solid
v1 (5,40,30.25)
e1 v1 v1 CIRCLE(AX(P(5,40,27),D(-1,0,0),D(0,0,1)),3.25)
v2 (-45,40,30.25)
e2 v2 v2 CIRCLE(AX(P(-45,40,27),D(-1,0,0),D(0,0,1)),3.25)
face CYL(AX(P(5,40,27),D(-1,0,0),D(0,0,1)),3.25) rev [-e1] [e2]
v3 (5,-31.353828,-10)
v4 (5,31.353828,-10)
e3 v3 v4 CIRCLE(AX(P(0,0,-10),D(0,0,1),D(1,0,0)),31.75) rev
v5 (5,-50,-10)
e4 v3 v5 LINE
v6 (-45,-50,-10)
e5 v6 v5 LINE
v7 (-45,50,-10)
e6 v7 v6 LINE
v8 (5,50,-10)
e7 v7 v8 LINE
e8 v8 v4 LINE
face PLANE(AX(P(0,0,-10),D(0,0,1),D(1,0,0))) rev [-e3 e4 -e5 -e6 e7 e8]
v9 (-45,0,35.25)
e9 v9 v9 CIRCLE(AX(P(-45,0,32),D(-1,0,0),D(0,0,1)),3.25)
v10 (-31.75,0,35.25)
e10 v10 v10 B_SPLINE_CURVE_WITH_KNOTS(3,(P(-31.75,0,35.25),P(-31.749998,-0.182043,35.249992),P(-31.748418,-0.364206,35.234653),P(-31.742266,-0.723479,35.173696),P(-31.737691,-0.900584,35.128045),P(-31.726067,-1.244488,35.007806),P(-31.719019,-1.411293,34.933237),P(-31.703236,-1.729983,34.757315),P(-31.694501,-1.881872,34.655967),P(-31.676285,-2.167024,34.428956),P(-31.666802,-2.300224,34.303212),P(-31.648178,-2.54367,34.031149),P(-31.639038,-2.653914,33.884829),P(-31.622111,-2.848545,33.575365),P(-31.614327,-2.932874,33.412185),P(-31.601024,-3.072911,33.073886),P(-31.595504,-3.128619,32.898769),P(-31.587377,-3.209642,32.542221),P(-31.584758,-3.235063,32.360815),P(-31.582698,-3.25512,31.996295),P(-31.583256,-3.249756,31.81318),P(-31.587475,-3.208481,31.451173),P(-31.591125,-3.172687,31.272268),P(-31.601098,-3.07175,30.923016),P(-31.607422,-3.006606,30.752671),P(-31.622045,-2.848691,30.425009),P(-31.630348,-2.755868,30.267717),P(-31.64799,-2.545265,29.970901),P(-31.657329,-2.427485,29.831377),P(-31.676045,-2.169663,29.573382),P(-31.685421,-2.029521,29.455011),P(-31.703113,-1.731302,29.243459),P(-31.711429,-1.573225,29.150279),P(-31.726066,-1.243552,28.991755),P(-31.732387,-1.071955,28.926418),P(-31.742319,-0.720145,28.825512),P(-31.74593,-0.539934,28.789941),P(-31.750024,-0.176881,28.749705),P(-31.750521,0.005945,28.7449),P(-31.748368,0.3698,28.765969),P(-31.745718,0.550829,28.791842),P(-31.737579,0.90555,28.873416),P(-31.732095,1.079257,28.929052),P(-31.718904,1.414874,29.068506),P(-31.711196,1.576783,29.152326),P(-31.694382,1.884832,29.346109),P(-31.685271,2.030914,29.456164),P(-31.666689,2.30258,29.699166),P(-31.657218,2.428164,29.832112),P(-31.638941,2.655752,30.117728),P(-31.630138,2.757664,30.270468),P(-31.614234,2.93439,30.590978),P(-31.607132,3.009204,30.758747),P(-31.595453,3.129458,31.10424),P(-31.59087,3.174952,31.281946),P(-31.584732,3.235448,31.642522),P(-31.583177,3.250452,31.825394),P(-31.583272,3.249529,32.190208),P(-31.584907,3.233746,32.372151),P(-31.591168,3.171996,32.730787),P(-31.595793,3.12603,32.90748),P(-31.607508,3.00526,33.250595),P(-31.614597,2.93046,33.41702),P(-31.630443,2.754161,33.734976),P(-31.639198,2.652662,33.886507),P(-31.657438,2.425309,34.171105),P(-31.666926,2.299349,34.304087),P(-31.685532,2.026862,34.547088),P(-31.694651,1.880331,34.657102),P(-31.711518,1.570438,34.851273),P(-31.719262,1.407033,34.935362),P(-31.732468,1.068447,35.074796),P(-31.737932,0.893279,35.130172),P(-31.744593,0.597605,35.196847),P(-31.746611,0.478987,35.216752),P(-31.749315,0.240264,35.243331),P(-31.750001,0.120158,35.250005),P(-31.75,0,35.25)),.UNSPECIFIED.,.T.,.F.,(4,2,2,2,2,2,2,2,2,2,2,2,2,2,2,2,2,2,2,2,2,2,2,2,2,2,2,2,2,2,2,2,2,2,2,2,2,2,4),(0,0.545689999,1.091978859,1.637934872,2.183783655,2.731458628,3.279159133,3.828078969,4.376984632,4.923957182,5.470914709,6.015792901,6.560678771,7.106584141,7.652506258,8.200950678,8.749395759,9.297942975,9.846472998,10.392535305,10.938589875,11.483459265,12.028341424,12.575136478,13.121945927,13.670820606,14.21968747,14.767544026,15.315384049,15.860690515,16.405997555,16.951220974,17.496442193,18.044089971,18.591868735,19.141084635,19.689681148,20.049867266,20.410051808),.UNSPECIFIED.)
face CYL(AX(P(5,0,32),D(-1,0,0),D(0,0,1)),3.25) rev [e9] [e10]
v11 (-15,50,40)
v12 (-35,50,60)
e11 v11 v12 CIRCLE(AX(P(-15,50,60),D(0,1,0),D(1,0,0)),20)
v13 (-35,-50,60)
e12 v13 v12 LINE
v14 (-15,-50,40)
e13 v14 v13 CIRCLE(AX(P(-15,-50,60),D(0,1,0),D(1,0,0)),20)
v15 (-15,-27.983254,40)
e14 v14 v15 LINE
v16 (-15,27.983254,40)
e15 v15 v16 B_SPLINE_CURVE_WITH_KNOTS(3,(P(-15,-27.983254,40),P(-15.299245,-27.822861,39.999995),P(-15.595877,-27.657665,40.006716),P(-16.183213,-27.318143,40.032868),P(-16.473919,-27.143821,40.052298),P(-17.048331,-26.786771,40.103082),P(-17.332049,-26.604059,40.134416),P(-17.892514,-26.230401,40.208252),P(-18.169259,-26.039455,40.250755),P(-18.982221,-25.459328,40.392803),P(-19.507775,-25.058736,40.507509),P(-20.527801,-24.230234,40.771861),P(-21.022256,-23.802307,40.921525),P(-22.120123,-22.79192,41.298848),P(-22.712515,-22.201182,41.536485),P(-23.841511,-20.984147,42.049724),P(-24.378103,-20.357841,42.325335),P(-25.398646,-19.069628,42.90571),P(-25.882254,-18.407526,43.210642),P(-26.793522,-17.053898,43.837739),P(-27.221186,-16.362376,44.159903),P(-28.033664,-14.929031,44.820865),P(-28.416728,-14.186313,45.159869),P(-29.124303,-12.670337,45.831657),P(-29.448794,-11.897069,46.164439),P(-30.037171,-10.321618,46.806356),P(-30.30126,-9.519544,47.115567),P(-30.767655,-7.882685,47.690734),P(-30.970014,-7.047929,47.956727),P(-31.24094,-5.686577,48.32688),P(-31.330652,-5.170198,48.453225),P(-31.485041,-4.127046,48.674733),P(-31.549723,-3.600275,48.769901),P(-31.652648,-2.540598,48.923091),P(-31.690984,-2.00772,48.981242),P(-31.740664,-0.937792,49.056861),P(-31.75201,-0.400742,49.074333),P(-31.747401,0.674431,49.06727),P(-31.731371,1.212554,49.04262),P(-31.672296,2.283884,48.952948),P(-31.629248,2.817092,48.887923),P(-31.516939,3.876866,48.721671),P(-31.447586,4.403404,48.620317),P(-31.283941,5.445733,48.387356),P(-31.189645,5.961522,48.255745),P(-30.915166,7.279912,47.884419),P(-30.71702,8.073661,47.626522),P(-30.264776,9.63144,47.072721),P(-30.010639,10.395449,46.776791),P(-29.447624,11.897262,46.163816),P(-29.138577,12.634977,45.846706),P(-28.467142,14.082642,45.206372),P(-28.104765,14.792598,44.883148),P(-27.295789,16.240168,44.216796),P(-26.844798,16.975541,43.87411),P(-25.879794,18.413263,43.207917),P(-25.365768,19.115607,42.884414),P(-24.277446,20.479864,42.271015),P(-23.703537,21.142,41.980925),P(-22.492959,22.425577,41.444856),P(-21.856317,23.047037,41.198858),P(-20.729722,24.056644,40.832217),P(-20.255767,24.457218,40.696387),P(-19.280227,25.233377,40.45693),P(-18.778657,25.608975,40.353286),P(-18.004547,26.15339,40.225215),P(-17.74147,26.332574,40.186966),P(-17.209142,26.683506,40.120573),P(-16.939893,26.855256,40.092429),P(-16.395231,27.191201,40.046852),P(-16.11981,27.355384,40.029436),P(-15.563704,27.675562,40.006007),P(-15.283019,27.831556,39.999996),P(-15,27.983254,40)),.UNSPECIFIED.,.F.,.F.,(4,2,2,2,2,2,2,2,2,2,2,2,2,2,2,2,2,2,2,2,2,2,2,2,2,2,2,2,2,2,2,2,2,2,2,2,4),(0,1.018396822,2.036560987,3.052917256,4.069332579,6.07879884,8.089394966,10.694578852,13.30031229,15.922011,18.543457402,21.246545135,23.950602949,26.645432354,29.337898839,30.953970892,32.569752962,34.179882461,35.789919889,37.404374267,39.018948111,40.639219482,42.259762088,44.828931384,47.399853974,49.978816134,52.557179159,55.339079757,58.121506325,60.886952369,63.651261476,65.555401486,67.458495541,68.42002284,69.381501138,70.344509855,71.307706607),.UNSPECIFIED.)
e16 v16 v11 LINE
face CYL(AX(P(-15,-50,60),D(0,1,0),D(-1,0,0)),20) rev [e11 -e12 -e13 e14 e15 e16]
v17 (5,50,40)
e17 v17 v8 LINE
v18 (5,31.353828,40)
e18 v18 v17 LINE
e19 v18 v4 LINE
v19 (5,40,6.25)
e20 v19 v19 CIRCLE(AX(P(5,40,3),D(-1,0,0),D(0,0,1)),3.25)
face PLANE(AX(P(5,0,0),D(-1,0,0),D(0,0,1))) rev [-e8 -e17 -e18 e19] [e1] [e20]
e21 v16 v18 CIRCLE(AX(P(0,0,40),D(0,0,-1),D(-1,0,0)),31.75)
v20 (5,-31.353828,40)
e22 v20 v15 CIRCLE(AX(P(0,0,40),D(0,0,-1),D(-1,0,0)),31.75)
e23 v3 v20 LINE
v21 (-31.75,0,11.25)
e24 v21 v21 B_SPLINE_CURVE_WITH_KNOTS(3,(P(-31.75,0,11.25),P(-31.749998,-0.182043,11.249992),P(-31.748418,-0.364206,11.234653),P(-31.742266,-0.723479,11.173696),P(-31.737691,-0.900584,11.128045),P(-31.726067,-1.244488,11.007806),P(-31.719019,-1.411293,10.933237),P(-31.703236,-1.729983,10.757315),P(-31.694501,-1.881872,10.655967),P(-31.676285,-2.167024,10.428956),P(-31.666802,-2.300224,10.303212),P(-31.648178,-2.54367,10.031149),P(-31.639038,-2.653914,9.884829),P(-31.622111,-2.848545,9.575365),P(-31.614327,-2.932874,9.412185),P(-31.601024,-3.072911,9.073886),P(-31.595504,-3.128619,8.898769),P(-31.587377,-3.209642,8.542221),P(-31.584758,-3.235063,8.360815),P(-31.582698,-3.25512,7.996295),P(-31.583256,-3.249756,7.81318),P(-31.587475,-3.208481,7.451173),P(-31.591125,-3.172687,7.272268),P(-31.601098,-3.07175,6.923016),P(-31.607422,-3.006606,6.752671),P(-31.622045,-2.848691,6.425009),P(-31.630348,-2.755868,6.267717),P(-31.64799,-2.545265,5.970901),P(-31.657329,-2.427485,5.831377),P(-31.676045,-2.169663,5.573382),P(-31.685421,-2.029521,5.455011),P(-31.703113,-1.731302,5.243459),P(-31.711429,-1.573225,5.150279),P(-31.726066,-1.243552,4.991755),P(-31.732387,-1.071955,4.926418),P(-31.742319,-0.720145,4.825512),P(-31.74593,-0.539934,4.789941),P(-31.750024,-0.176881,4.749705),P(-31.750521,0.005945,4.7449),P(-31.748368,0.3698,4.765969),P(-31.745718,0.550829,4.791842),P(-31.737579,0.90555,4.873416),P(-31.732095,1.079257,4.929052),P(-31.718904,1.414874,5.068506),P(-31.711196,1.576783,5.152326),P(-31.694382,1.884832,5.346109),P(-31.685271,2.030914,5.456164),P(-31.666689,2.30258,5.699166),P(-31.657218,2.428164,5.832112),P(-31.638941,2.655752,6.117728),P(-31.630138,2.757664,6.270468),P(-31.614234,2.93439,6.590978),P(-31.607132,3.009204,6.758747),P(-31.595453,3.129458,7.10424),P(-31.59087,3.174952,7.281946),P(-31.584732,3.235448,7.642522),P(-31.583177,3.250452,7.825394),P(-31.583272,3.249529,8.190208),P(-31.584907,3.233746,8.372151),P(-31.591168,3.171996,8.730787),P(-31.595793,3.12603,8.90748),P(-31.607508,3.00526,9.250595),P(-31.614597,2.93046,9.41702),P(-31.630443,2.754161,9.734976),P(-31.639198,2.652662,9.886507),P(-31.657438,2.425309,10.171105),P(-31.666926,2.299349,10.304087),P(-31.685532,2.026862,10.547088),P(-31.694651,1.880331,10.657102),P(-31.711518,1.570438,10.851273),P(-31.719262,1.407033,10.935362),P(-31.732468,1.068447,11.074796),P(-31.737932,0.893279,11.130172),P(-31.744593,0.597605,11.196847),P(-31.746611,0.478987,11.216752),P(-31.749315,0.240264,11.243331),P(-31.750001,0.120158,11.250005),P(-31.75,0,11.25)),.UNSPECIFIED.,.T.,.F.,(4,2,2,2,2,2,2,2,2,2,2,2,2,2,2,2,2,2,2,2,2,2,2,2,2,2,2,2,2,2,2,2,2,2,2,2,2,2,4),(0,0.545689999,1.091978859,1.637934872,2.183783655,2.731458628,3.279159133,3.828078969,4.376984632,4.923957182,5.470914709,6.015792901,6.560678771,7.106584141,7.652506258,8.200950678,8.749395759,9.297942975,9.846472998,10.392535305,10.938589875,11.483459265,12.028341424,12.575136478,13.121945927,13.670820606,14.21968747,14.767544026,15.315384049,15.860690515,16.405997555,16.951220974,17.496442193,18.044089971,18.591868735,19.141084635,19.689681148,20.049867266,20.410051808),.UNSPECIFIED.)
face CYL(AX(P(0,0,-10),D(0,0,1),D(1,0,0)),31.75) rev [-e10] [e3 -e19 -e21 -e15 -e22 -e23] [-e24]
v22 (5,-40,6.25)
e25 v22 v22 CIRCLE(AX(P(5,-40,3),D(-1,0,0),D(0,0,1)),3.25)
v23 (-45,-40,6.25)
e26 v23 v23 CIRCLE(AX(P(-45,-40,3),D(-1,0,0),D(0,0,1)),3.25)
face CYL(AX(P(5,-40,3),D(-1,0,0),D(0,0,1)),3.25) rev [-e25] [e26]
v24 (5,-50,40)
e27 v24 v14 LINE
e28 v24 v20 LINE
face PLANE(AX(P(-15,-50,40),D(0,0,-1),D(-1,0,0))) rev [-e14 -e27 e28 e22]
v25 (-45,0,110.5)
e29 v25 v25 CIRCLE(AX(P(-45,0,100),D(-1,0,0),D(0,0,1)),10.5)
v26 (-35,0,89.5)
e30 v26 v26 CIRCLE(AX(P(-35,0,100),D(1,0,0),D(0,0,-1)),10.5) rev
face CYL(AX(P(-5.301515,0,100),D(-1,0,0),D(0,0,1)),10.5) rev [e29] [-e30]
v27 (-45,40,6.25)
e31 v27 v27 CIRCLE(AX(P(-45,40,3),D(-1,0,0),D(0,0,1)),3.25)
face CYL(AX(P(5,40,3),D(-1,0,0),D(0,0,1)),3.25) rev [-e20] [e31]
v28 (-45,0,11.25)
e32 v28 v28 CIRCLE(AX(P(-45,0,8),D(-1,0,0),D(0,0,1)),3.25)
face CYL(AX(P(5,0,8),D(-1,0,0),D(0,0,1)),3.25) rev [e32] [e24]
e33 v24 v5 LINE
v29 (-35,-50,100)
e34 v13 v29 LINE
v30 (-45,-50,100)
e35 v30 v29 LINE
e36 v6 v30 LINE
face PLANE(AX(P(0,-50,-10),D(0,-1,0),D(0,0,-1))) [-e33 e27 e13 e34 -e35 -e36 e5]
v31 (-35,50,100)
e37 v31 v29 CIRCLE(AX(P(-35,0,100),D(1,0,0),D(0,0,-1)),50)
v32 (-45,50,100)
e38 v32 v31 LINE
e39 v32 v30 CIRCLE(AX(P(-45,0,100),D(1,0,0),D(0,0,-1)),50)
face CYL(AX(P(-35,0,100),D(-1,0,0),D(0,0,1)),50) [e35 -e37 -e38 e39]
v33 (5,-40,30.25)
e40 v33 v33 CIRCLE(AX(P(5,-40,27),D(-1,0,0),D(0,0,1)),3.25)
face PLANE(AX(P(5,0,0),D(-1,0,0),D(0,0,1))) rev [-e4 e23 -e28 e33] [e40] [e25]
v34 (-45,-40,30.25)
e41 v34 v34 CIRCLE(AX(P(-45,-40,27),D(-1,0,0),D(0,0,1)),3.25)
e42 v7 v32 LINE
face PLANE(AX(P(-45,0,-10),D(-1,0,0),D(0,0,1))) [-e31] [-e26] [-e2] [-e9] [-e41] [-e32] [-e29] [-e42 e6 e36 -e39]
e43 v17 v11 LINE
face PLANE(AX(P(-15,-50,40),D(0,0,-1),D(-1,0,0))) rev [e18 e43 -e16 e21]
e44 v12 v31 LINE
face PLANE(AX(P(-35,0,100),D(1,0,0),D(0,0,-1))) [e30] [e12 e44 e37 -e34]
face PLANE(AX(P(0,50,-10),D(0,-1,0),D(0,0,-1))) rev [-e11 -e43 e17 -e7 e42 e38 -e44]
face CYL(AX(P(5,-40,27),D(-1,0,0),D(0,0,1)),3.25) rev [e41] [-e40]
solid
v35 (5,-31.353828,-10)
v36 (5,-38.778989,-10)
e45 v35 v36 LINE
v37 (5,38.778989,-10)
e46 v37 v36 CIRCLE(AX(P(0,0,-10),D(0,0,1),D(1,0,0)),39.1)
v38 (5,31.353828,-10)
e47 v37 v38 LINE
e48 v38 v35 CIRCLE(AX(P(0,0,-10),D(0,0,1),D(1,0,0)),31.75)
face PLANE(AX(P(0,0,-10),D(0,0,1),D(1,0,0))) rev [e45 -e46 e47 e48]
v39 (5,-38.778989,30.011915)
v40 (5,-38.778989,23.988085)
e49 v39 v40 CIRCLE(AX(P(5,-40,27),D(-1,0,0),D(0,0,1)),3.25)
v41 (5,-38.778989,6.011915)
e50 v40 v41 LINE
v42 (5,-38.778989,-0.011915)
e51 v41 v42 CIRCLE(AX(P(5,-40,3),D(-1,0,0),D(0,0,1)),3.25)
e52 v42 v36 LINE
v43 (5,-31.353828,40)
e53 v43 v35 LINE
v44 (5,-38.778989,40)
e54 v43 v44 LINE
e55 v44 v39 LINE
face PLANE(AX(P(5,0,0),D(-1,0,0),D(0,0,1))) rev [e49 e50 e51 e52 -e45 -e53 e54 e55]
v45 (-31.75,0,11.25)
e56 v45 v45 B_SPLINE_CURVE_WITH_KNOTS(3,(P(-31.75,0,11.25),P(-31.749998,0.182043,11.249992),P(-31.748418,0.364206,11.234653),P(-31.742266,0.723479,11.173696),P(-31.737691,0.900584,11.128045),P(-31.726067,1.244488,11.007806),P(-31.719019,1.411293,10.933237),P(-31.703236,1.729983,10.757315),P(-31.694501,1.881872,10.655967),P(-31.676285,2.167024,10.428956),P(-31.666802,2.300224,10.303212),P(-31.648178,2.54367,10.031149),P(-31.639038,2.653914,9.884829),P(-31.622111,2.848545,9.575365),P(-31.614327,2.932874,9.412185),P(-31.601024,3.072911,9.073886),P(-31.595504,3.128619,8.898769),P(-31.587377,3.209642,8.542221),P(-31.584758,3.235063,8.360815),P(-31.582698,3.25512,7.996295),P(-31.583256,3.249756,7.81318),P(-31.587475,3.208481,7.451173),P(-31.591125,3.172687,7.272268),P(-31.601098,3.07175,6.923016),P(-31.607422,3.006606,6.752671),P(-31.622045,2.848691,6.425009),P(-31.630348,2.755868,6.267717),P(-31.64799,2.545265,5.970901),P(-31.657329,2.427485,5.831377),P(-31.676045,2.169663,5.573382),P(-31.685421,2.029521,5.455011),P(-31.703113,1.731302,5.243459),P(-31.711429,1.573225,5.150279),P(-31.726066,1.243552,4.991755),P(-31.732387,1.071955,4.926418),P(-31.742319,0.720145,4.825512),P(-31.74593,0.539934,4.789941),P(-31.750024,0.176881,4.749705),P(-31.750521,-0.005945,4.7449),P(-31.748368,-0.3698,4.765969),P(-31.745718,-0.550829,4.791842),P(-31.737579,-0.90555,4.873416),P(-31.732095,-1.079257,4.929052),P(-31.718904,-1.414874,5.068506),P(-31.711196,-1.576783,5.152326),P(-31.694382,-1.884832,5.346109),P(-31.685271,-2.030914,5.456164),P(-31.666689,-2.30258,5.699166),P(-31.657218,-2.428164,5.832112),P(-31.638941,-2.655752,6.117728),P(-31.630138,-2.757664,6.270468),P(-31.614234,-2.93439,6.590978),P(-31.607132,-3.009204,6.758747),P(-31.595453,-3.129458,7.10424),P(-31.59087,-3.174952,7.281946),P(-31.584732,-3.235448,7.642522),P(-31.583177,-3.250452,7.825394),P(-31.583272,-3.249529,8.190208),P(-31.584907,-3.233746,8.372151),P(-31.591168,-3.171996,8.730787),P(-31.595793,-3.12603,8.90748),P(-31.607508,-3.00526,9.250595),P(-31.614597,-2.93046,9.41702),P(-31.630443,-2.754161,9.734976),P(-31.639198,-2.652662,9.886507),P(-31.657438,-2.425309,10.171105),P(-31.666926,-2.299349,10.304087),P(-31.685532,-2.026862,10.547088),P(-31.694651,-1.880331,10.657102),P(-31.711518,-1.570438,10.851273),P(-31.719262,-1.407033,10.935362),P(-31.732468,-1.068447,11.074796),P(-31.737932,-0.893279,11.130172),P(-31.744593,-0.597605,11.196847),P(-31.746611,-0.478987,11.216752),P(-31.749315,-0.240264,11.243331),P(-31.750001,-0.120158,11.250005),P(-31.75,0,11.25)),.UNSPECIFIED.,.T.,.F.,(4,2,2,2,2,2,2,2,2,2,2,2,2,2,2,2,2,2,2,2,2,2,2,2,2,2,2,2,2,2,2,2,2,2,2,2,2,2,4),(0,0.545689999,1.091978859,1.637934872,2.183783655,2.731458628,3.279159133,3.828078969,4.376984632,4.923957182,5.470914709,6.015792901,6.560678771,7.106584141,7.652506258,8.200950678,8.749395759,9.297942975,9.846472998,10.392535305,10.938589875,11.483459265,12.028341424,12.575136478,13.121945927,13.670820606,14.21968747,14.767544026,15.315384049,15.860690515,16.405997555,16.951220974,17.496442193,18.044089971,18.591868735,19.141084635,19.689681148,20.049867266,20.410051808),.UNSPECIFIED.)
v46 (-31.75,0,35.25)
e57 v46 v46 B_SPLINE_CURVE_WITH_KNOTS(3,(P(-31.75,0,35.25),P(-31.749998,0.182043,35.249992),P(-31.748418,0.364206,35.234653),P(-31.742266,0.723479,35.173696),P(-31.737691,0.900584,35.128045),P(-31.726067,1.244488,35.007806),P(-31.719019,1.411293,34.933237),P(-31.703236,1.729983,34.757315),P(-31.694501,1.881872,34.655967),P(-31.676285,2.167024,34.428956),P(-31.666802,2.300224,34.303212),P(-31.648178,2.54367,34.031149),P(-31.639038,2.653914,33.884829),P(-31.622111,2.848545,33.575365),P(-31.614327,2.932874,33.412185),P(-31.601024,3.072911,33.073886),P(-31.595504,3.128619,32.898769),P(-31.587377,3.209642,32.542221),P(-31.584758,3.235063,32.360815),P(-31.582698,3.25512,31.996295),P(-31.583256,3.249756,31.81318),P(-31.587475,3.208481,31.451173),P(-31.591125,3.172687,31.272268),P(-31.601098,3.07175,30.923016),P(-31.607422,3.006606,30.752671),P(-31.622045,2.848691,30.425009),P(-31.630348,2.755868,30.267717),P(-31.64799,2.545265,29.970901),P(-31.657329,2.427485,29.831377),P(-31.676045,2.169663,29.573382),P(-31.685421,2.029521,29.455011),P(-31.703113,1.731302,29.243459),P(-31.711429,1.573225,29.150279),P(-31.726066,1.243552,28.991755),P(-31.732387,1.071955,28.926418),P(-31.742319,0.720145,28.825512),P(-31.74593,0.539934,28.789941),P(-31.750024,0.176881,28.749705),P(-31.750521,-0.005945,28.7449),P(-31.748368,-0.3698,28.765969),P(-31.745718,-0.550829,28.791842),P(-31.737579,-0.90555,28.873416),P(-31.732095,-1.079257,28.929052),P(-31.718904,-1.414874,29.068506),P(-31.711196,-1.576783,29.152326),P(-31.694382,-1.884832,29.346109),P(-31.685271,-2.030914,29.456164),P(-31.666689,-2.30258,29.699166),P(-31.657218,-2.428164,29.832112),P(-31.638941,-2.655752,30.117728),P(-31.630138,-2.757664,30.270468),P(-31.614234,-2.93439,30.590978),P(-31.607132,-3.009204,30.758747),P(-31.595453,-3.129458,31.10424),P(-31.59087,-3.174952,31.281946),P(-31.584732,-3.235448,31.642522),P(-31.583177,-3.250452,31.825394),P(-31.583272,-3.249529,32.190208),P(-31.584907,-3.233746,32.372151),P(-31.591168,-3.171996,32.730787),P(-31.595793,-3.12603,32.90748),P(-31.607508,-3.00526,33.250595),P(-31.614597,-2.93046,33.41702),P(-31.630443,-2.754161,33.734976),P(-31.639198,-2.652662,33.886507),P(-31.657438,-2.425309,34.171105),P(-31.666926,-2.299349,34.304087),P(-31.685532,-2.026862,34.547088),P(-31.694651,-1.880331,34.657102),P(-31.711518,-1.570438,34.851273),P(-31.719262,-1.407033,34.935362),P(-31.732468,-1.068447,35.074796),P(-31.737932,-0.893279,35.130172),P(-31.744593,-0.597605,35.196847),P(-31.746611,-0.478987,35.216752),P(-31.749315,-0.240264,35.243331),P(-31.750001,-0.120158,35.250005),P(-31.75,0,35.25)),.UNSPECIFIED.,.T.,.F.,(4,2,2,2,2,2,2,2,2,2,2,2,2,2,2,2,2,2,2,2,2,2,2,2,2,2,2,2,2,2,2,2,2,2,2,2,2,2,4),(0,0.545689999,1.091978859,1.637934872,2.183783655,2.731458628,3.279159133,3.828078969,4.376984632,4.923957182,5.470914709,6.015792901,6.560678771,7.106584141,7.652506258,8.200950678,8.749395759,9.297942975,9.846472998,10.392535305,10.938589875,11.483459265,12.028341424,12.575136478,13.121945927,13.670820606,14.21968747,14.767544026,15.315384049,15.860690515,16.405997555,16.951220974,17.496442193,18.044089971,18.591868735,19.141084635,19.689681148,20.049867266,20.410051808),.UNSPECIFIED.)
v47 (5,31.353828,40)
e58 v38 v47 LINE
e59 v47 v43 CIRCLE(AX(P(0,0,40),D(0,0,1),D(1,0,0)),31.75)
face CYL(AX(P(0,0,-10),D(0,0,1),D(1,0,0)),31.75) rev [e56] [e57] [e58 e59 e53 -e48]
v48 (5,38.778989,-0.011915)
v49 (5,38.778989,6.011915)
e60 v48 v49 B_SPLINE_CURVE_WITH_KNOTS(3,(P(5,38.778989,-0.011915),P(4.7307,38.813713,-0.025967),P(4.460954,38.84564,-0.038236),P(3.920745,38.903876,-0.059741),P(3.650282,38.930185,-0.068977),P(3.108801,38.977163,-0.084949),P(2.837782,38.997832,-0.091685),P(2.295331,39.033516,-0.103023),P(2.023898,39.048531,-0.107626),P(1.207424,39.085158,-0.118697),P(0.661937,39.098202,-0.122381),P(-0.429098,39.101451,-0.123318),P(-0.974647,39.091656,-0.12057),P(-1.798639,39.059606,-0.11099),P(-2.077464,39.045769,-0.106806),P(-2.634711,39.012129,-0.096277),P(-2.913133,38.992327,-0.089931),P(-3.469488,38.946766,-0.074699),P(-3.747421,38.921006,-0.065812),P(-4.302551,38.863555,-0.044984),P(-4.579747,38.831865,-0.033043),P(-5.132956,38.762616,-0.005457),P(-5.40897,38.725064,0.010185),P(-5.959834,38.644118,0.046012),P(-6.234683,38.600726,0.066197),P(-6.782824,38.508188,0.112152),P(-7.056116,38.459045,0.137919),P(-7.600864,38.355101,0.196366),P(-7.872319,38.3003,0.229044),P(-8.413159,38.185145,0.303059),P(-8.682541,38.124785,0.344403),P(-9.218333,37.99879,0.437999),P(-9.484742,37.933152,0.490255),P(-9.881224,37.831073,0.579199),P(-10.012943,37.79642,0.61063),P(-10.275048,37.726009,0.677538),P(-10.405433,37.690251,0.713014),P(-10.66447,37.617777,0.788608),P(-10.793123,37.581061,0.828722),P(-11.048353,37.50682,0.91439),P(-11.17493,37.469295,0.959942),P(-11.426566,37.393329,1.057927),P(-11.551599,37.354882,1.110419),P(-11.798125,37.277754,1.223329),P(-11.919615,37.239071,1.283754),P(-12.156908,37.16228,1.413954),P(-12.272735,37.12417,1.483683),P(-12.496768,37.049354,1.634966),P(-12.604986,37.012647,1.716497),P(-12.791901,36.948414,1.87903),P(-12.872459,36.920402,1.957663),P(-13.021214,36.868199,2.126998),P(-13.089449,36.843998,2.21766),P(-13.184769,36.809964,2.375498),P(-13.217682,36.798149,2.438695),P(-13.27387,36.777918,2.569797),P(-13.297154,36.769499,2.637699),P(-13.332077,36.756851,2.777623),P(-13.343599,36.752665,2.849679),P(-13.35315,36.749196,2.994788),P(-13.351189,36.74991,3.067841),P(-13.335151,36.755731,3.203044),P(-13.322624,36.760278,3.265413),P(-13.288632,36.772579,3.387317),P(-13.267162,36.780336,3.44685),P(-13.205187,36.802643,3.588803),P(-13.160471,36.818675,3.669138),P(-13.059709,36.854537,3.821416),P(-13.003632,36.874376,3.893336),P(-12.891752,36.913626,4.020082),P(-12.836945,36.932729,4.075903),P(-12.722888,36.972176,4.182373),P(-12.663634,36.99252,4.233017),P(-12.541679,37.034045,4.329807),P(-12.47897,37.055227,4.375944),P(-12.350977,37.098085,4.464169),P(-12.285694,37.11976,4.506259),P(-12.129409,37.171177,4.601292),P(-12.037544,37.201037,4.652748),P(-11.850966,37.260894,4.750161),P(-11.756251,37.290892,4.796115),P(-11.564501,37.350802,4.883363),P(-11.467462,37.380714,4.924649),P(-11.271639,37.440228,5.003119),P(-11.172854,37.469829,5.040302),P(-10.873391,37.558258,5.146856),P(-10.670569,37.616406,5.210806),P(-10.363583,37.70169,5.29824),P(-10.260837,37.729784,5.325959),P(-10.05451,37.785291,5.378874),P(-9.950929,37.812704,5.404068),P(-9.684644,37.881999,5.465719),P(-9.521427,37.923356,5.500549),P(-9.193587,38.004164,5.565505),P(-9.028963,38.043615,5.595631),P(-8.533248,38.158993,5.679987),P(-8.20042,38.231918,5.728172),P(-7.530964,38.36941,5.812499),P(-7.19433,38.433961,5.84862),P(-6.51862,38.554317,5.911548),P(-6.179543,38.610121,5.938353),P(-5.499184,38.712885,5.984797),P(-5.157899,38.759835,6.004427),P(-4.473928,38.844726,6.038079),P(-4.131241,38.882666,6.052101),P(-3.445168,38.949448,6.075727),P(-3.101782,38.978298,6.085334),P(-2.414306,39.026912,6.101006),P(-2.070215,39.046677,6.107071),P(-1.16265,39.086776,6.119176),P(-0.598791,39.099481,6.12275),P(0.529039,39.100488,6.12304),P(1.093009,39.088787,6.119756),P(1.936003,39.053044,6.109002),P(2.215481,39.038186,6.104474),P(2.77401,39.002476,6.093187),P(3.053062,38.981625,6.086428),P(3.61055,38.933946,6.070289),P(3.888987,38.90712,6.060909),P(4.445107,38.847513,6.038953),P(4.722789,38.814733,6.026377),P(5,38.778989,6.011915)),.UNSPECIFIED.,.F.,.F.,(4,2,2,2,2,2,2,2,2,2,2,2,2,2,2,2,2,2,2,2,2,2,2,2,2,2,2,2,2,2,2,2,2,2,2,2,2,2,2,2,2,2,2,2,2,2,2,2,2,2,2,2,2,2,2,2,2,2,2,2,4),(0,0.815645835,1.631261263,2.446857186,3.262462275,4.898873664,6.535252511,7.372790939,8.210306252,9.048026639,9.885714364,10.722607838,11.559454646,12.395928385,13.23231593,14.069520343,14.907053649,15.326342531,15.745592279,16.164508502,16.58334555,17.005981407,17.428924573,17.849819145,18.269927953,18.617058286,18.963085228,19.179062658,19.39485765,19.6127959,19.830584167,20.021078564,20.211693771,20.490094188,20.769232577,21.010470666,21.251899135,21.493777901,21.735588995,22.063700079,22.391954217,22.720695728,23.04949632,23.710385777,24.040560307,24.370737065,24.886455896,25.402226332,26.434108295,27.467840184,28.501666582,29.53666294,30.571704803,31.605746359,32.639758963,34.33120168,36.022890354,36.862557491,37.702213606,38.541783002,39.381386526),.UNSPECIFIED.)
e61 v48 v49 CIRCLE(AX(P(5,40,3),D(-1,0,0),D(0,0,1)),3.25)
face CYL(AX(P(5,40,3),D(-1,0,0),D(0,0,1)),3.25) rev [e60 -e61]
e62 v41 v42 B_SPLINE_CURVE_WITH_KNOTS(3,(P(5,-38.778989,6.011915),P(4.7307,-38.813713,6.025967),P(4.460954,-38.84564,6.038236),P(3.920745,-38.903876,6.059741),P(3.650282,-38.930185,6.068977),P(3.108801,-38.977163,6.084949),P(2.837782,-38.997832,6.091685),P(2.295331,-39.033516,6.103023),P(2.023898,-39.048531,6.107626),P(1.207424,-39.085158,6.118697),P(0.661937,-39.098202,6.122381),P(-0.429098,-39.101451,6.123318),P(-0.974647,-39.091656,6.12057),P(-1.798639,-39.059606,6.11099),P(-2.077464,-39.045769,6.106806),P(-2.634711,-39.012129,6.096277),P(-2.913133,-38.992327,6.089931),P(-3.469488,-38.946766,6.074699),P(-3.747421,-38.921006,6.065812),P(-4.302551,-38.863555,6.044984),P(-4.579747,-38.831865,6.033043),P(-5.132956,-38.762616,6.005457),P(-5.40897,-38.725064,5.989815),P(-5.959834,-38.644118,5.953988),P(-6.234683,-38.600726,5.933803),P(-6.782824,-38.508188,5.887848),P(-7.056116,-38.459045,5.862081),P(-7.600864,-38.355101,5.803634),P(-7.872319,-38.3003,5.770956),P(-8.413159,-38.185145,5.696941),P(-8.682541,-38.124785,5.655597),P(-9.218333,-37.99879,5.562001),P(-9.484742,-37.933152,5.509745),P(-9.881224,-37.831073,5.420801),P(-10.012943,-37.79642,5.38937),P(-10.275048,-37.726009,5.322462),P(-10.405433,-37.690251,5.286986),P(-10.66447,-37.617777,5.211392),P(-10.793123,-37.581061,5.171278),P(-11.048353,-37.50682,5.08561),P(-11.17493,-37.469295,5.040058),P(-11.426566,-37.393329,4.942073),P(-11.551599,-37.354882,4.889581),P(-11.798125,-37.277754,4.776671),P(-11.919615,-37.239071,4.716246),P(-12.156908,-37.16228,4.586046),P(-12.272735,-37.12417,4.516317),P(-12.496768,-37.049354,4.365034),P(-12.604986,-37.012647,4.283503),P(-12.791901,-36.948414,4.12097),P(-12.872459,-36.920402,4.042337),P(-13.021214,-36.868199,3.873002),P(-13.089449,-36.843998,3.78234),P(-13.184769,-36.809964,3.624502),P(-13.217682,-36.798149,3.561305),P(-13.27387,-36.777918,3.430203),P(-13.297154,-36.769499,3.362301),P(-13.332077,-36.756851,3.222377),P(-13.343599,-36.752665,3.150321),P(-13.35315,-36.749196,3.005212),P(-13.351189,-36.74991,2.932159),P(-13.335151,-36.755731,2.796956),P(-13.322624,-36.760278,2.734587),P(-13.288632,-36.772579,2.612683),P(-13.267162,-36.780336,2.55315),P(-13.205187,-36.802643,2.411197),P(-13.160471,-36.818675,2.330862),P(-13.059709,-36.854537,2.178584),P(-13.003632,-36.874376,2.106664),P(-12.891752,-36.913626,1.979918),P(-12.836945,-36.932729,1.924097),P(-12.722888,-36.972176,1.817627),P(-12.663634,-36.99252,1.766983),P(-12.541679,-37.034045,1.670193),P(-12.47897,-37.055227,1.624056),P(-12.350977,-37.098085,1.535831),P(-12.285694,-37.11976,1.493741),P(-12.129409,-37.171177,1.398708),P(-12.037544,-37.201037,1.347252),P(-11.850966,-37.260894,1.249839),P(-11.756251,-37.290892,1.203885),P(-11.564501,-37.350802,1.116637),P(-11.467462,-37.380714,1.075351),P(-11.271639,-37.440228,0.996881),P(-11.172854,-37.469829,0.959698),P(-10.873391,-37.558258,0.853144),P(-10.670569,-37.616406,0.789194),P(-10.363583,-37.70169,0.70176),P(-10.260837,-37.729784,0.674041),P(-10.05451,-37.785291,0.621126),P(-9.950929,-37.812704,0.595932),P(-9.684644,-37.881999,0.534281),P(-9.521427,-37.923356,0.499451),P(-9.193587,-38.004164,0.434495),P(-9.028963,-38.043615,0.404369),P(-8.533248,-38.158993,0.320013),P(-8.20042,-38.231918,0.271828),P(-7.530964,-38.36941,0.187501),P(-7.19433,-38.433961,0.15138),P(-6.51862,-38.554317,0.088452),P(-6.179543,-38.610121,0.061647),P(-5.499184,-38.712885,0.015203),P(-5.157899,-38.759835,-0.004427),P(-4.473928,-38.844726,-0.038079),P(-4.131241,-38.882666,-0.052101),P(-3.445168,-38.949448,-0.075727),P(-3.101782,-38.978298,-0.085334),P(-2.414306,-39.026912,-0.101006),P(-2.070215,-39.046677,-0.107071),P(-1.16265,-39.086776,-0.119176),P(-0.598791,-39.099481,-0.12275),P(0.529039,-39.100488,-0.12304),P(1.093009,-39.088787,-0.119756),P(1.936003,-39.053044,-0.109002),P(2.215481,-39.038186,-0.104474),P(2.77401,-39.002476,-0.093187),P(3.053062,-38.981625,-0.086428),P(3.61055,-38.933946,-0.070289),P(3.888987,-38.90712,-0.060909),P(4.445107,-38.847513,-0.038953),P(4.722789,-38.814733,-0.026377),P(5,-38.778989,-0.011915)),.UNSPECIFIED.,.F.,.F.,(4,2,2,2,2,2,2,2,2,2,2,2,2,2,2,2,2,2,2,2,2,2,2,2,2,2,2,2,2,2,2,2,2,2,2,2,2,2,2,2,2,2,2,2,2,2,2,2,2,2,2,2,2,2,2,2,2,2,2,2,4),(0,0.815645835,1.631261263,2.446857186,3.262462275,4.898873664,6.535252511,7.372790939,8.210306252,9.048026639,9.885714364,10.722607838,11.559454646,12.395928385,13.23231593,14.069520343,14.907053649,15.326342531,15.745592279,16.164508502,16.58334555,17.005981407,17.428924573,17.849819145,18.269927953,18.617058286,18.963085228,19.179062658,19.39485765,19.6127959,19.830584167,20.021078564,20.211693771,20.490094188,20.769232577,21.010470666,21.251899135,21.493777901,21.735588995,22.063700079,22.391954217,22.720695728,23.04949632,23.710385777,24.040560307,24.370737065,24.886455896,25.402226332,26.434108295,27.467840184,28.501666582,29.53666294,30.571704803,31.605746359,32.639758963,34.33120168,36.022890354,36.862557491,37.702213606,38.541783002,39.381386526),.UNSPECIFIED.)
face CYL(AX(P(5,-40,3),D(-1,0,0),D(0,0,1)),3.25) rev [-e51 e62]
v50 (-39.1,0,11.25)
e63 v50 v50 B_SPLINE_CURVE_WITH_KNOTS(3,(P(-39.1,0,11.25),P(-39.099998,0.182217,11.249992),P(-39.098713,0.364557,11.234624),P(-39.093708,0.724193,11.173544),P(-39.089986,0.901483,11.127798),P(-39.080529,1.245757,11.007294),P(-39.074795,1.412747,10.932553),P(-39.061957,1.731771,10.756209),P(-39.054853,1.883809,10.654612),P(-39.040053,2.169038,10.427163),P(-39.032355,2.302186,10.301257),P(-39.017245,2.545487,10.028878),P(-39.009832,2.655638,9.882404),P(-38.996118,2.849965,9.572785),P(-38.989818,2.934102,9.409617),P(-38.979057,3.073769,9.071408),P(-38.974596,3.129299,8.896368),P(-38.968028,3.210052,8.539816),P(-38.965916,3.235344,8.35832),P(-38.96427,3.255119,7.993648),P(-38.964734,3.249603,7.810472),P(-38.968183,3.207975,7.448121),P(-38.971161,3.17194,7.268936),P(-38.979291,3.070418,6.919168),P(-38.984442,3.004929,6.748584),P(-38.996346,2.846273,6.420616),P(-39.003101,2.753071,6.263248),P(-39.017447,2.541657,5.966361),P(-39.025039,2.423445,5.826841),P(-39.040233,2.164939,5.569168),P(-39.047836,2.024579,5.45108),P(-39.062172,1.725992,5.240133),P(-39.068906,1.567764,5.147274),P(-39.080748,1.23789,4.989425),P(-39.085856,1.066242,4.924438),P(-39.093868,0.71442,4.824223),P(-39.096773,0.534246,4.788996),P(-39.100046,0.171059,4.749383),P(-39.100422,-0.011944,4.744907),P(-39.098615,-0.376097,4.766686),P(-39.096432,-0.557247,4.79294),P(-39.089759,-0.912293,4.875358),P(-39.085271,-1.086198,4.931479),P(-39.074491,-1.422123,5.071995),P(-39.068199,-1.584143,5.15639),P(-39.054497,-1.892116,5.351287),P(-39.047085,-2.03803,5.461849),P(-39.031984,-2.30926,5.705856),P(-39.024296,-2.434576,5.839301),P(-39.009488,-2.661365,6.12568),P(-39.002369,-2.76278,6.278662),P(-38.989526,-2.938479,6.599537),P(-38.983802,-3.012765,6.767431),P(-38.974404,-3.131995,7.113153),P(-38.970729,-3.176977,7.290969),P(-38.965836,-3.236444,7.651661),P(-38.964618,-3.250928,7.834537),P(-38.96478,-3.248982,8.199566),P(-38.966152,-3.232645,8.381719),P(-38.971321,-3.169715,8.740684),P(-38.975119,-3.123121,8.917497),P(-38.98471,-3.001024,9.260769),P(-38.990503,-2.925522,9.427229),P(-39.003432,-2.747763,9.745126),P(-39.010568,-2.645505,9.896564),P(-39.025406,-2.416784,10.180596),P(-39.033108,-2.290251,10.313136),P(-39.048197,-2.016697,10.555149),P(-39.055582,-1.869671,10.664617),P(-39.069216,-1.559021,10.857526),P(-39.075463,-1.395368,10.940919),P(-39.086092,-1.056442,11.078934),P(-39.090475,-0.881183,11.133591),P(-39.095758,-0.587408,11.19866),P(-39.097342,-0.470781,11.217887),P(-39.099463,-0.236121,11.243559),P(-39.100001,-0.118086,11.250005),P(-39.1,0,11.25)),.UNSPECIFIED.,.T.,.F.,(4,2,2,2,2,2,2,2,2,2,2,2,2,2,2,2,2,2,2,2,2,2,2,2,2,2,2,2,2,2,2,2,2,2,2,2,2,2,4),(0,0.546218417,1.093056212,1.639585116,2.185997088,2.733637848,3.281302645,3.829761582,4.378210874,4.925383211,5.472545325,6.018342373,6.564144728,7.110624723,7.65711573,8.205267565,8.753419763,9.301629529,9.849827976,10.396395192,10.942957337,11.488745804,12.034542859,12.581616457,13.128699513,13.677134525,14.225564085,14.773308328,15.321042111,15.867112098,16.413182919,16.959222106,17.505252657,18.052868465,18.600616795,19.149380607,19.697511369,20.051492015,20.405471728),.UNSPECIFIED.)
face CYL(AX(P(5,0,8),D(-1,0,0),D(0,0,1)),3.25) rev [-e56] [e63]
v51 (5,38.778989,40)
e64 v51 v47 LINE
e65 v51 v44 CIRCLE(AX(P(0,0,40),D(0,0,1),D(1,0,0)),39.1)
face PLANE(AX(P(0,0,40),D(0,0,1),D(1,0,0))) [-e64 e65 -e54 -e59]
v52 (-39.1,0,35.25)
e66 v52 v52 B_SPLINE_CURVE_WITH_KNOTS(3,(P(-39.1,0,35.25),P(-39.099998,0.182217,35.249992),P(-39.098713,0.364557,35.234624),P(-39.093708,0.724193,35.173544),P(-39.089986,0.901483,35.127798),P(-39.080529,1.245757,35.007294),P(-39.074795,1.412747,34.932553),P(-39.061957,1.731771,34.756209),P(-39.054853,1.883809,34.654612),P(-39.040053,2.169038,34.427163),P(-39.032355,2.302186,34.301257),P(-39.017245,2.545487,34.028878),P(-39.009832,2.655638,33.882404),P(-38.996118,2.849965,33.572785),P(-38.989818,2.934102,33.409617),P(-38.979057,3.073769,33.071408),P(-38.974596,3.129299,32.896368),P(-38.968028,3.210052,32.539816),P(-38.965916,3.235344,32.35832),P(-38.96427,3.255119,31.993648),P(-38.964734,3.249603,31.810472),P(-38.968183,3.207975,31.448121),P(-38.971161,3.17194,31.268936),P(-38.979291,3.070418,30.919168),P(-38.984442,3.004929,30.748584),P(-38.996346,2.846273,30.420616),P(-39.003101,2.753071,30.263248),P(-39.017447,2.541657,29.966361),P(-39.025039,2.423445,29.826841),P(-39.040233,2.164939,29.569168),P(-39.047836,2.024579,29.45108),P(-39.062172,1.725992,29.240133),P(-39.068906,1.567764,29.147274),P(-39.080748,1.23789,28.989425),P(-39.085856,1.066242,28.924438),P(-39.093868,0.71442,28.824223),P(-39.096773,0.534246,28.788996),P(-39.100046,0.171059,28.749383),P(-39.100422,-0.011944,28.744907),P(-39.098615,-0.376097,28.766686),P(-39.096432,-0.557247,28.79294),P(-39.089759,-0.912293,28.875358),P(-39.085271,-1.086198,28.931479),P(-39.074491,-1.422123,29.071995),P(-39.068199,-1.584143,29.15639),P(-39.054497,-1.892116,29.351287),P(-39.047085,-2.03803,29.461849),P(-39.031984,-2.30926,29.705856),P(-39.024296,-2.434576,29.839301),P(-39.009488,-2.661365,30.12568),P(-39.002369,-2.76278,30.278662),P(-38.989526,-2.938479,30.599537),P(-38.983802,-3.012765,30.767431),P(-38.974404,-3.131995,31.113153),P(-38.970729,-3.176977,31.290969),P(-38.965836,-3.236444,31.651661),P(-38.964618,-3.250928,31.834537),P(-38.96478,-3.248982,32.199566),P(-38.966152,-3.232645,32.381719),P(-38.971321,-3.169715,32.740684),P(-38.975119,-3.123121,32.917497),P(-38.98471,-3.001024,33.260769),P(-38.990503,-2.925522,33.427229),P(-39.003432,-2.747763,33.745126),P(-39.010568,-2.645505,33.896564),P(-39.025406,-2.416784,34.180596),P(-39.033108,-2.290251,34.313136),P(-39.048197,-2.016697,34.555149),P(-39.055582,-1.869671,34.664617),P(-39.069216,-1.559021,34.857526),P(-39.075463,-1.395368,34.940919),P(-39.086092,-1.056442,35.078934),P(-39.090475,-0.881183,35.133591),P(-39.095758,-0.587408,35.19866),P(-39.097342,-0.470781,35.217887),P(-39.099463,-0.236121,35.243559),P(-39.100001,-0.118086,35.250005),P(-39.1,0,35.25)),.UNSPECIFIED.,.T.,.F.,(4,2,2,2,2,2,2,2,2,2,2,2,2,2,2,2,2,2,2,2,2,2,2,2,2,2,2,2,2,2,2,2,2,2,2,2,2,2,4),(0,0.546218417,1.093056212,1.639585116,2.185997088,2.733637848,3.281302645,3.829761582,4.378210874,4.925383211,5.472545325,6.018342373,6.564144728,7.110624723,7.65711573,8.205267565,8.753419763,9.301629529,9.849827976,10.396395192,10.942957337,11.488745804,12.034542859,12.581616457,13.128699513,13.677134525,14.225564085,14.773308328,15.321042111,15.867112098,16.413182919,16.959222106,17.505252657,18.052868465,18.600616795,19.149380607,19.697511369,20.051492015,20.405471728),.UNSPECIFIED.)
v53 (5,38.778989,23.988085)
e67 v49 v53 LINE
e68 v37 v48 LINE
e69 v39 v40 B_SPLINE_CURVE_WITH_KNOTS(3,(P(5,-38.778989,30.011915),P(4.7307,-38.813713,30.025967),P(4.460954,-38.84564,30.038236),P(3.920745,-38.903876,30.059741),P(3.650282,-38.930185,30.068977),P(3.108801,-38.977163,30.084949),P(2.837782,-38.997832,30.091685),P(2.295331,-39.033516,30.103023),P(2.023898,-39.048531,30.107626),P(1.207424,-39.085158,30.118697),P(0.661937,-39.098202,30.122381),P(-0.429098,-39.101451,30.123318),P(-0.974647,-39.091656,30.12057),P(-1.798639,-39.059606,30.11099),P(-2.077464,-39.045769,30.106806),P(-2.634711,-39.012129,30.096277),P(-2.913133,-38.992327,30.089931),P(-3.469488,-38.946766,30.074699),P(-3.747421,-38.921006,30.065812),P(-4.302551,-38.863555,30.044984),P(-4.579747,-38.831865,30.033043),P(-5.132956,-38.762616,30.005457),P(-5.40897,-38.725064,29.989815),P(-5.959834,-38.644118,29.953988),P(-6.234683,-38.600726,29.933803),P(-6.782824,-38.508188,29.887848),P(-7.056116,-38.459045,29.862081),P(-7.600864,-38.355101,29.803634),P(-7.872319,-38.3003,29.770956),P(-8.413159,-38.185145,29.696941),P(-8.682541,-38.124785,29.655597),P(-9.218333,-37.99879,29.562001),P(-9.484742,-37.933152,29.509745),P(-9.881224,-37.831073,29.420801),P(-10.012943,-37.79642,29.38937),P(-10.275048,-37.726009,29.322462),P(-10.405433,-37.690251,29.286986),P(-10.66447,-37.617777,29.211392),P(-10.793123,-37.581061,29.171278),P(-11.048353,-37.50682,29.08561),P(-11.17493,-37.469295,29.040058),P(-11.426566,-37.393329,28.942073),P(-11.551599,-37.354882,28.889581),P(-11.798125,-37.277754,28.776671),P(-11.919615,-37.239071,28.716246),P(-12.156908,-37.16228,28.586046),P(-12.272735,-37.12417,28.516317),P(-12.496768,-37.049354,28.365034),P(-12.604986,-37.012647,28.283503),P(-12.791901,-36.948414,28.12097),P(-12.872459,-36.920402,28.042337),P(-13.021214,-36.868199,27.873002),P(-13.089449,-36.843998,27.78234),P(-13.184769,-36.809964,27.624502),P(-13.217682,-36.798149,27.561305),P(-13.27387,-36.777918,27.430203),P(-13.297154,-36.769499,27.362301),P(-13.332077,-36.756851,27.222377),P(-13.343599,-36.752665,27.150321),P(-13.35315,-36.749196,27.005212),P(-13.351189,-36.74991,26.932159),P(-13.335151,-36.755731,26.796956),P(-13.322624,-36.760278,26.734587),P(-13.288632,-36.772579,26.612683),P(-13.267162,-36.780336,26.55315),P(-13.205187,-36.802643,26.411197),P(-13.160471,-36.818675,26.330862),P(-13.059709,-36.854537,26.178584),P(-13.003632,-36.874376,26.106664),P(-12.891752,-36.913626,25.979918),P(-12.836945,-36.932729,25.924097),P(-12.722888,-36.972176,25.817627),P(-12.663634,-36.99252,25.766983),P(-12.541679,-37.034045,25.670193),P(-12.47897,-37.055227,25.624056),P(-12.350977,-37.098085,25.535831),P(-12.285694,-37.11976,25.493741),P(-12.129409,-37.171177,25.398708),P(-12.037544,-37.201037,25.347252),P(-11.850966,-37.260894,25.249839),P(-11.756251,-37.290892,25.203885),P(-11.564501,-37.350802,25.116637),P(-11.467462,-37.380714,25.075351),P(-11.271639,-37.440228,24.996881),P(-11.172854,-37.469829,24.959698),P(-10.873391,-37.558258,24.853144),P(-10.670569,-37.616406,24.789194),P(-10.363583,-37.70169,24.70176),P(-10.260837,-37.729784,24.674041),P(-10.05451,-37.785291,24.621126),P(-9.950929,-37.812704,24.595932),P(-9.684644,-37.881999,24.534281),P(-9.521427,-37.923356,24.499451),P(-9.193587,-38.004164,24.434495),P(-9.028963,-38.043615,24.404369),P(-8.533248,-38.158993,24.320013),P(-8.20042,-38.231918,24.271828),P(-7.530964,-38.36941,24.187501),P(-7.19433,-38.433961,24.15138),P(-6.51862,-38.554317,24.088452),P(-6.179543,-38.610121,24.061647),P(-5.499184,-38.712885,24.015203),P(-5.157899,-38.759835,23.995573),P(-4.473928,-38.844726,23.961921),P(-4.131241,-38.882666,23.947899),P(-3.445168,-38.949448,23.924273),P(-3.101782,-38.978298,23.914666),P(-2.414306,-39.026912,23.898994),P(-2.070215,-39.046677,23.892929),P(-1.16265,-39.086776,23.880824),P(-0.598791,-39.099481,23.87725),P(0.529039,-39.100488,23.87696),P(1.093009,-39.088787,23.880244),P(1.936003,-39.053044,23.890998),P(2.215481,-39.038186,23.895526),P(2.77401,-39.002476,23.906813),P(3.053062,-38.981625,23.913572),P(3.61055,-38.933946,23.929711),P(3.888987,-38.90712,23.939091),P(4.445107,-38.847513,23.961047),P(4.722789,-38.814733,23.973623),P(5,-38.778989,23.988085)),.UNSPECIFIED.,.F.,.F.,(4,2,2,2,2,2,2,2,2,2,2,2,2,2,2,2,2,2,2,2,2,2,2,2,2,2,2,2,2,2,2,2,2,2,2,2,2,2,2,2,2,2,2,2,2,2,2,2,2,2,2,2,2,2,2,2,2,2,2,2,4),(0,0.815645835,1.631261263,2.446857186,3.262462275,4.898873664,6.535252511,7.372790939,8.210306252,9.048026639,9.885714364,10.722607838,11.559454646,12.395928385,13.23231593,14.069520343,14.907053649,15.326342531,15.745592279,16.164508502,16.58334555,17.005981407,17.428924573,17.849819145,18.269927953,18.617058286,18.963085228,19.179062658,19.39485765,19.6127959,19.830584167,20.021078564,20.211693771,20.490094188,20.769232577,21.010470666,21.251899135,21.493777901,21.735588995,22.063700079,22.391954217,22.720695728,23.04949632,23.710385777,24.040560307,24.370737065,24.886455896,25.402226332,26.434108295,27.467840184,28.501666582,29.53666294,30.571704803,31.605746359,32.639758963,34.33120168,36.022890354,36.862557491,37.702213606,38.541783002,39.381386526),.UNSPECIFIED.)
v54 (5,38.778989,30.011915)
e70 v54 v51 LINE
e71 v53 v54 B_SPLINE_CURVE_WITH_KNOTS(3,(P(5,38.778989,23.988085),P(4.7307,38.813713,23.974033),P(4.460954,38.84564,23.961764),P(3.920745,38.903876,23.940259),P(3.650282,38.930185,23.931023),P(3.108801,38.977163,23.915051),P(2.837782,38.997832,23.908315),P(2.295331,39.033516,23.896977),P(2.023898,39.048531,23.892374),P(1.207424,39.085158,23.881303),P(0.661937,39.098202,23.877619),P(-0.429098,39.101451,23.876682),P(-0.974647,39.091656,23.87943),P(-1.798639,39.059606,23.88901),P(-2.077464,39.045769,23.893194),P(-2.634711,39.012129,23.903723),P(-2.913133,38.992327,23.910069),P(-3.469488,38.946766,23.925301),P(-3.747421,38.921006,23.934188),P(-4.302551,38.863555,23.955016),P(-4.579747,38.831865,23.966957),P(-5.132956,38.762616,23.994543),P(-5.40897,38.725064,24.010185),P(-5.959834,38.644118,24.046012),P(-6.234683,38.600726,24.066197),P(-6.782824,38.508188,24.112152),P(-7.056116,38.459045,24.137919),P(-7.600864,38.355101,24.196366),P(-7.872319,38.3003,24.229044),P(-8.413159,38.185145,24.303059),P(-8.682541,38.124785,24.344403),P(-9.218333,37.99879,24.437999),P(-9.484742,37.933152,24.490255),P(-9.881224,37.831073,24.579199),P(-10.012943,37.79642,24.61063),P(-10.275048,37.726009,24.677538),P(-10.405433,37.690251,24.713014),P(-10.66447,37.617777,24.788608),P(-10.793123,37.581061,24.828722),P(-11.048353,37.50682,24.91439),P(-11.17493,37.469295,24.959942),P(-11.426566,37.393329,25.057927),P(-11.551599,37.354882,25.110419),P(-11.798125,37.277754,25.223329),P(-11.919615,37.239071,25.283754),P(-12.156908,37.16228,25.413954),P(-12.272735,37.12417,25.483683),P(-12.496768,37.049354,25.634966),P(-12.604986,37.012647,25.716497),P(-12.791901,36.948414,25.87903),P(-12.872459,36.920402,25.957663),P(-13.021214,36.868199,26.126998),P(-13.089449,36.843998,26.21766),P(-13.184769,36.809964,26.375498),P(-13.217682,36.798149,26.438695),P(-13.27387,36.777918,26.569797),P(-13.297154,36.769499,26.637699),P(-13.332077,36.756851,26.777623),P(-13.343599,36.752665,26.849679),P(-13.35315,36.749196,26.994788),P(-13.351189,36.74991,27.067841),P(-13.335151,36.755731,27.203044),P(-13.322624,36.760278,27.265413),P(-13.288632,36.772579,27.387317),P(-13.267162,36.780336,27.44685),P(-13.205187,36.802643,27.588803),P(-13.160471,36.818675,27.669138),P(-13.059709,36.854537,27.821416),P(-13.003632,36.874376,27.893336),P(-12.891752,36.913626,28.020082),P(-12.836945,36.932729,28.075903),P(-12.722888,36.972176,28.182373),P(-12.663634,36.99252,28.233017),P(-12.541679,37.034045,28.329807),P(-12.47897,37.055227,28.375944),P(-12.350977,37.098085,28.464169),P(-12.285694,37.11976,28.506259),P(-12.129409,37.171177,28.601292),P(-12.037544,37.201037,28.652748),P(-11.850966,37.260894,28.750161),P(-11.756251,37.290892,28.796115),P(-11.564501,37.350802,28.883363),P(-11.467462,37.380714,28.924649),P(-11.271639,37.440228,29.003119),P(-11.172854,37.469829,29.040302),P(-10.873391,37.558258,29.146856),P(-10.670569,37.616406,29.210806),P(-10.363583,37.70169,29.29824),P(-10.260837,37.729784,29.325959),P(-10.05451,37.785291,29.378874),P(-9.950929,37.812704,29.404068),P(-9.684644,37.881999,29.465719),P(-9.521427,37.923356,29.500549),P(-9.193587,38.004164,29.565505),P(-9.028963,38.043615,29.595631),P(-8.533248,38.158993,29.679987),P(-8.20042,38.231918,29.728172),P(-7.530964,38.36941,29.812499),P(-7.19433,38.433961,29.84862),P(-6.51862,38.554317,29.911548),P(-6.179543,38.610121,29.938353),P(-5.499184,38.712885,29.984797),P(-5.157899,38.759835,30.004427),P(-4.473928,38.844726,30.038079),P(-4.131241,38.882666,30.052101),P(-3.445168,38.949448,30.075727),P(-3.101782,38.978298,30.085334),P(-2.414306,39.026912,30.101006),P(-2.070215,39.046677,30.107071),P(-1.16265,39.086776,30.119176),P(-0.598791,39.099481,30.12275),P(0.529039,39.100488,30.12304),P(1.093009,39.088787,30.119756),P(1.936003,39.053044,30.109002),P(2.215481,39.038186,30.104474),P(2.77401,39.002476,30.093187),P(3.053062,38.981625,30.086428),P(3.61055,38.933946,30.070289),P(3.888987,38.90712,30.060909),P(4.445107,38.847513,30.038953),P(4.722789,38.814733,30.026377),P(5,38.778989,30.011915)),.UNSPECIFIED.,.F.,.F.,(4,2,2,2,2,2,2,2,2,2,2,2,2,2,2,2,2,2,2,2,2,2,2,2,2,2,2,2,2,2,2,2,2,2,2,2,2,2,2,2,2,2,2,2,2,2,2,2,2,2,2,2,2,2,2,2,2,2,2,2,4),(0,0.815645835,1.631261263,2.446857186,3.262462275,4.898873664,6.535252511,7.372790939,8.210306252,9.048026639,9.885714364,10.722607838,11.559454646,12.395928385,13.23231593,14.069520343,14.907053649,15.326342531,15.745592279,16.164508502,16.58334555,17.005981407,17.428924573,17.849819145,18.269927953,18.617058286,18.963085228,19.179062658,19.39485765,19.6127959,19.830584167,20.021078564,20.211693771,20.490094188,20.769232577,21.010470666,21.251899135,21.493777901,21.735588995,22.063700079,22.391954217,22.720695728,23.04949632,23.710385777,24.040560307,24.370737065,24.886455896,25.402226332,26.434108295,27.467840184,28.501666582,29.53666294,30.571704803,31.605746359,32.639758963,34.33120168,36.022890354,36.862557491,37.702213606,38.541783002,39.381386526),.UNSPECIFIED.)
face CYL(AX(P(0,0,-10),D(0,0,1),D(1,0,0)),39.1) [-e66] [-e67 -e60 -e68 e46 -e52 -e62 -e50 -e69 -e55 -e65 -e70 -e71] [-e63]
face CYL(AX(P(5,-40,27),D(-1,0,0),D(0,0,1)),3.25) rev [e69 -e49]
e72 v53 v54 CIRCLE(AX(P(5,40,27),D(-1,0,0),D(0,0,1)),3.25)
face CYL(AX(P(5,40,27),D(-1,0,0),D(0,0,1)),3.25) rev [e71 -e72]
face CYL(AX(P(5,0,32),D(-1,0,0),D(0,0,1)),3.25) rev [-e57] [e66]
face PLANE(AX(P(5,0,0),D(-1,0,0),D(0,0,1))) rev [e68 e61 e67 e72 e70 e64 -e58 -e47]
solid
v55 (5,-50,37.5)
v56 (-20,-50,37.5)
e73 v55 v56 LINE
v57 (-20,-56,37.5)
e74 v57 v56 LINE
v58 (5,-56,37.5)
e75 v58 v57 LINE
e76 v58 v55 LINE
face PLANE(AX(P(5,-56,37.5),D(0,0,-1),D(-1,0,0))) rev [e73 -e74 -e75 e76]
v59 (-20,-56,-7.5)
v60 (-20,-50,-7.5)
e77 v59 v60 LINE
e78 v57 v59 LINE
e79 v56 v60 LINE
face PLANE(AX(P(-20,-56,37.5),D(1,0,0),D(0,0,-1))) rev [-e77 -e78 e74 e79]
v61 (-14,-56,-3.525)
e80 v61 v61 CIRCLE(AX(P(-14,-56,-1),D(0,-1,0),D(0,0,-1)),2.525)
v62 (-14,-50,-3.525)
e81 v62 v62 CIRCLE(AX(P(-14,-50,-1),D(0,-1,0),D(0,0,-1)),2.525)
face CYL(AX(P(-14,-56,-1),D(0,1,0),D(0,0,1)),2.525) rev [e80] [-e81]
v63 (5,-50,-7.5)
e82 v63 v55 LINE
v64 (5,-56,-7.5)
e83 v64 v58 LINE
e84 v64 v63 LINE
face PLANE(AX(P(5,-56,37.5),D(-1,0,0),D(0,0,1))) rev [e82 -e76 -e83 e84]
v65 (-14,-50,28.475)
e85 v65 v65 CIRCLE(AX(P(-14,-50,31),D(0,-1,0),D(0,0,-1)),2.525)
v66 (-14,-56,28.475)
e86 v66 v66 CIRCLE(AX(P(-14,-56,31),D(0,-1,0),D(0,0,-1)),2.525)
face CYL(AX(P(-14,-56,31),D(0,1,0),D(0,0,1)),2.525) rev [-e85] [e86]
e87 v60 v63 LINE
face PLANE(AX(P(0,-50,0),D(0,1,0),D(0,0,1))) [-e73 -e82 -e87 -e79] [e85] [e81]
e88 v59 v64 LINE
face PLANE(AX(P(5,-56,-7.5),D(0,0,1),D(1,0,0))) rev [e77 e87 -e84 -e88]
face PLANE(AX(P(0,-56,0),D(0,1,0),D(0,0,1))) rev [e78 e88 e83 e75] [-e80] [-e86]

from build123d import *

# Parameters (mm, degrees)
CENTRE_HOLE_FOR_L2_DEPTH      = 40
CENTRE_HOLE_FOR_L2_DEPTH_BACK = 10
SKETCH1_R                     = 39.1
SKETCH1_R_2                   = 31.75
MAIN_STRUCTURE_DEPTH          = 60
MAIN_STRUCTURE_DEPTH_BACK     = 50
SKETCH2_W                     = 90
SKETCH2_H                     = 100
SKETCH2_R                     = 31.75
BEARING_CURVE_DEPTH           = 10
SKETCH6_R                     = 10.5
SHAFT_HOLE_DEPTH              = 10
WRIST_CUTOUT_DEPTH            = 186.809041761
SURFACECUT1_START             = 5
SURFACECUT1_OUTLINE_R         = 10.5
SURFACECUT1_DEPTH             = 40
SKETCH13_W                    = 25
SKETCH13_H                    = 45
SKETCH13_R                    = 2.525
BOSS_EXTRUDE1_DEPTH           = 6
SKETCH14_R                    = 3.25
CUT_EXTRUDE2_DEPTH            = 168.7378908
SKETCH15_R                    = 3.25
CUT_EXTRUDE3_DEPTH            = 168.7378908


# Read off the part's stored shape, not the designer's step: SurfaceCut1
with BuildPart() as part:
    # Sketch1 → Centre Hole for L2 (new, two sides: drawn at the far end of the back side and taken through both)
    with BuildSketch(Plane.XY.offset(-CENTRE_HOLE_FOR_L2_DEPTH_BACK)):
        Circle(SKETCH1_R)
        Circle(SKETCH1_R_2, mode=Mode.SUBTRACT)
    extrude(amount=CENTRE_HOLE_FOR_L2_DEPTH + CENTRE_HOLE_FOR_L2_DEPTH_BACK)


with BuildPart() as body_2:
    # Sketch2 → Main Structure (new, two sides: drawn at the far end of the back side and taken through both)
    with BuildSketch(Plane.XY.offset(40).offset(-MAIN_STRUCTURE_DEPTH_BACK)):
        Rectangle(SKETCH2_W, SKETCH2_H)
        Circle(SKETCH2_R, mode=Mode.SUBTRACT)
    extrude(amount=MAIN_STRUCTURE_DEPTH + MAIN_STRUCTURE_DEPTH_BACK)

    # Sketch3 → Bearing Curve (add)
    with BuildSketch(Plane.ZY.offset(45)):
        with BuildLine():
            Line((100, 50), (100, -50))
            ThreePointArc((100, -50), (150, 0), (100, 50))
        make_face()
    bearing_curve = extrude(amount=-BEARING_CURVE_DEPTH)

    # Upright Mirror: Bearing Curve across plane
    add(bearing_curve.mirror(Plane(origin=(0, 0, 0), x_dir=(0, 0, 1), z_dir=(1, 0, 0))))

    # Sketch6 → Shaft Hole (cut)
    with BuildSketch(Plane.ZY.offset(45)):
        with Locations((100, 0)):
            Circle(SKETCH6_R)
    shaft_hole = extrude(amount=-SHAFT_HOLE_DEPTH, mode=Mode.SUBTRACT)

    # Sketch4 → Wrist Cutout (cut, through all)
    with BuildSketch(Plane(origin=(0, 50, 0), x_dir=(1, 0, 0), z_dir=(0, 1, 0))):
        with BuildLine():
            Line((-35, -100), (-35, -60))
            ThreePointArc((-35, -60), (-29.142135624, -45.857864376), (-15, -40))
            Line((-15, -40), (15, -40))
            ThreePointArc((15, -40), (29.142135624, -45.857864376), (35, -60))
            Line((35, -60), (35, -100))
            Line((35, -100), (-35, -100))
        make_face()
    extrude(amount=-WRIST_CUTOUT_DEPTH, mode=Mode.SUBTRACT)

    # Bearing Mirror: Shaft Hole across plane
    add(shaft_hole.mirror(Plane(origin=(0, 0, 0), x_dir=(0, 0, 1), z_dir=(1, 0, 0))), mode=Mode.SUBTRACT)


with BuildPart() as surfacecut1_tool:
    # SurfaceCut1 outline → SurfaceCut1 (new body)
    with BuildSketch(Plane.YZ.offset(SURFACECUT1_START)):
        with BuildLine():
            ThreePointArc((50, 100), (0, 150), (-50, 100))
            Line((-50, 100), (-50, -10))
            Line((-50, -10), (50, -10))
            Line((50, -10), (50, 100))
        make_face()
        with Locations((0, 100)):
            Circle(SURFACECUT1_OUTLINE_R, mode=Mode.SUBTRACT)
    extrude(amount=SURFACECUT1_DEPTH)


with BuildPart() as part_1:
    add(part.part)

    # SurfaceCut1: cut by surfacecut1_tool
    add(surfacecut1_tool.part, mode=Mode.SUBTRACT)


with BuildPart() as body_2_1:
    add(body_2.part)

    # SurfaceCut1: cut by surfacecut1_tool
    add(surfacecut1_tool.part, mode=Mode.SUBTRACT)


with BuildPart() as body_3:
    # Sketch13 → Boss-Extrude1 (new body)
    with BuildSketch(Plane(origin=(0, -50, 0), x_dir=(-1, 0, 0), z_dir=(0, -1, 0))):
        with Locations((7.5, -15)):
            Rectangle(SKETCH13_W, SKETCH13_H)
        with Locations(Location((14, -31, 0), (0, 0, 90))):
            Circle(SKETCH13_R, mode=Mode.SUBTRACT)
        with Locations(Location((14, 1, 0), (0, 0, 90))):
            Circle(SKETCH13_R, mode=Mode.SUBTRACT)
    extrude(amount=BOSS_EXTRUDE1_DEPTH)


with BuildPart() as cut_extrude2_tool:
    # Sketch14 → Cut-Extrude2 (new, through all)
    with BuildSketch(Plane.ZY.offset(45)):
        with Locations((8, 0)):
            Circle(SKETCH14_R)
        with Locations((32, 0)):
            Circle(SKETCH14_R)
    extrude(amount=-CUT_EXTRUDE2_DEPTH)


with BuildPart() as part_2:
    add(part_1.part)

    # Cut-Extrude2: cut by cut_extrude2_tool
    add(cut_extrude2_tool.part, mode=Mode.SUBTRACT)


with BuildPart() as body_2_2:
    add(body_2_1.part)

    # Cut-Extrude2: cut by cut_extrude2_tool
    add(cut_extrude2_tool.part, mode=Mode.SUBTRACT)


with BuildPart() as cut_extrude3_tool:
    # Sketch15 → Cut-Extrude3 (new, through all)
    with BuildSketch(Plane.ZY.offset(45)):
        with Locations((32, 0)):
            Circle(SKETCH15_R)
        with Locations((8, 0)):
            Circle(SKETCH15_R)
        with Locations((3, 40)):
            Circle(SKETCH15_R)
        with Locations((27, 40)):
            Circle(SKETCH15_R)
        with Locations((3, -40)):
            Circle(SKETCH15_R)
        with Locations((27, -40)):
            Circle(SKETCH15_R)
    extrude(amount=-CUT_EXTRUDE3_DEPTH)


with BuildPart() as part_3:
    add(part_2.part)

    # Cut-Extrude3: cut by cut_extrude3_tool
    add(cut_extrude3_tool.part, mode=Mode.SUBTRACT)


with BuildPart() as body_2_3:
    add(body_2_2.part)

    # Cut-Extrude3: cut by cut_extrude3_tool
    add(cut_extrude3_tool.part, mode=Mode.SUBTRACT)


solid = Compound([body_3.part, part_3.part, body_2_3.part])
